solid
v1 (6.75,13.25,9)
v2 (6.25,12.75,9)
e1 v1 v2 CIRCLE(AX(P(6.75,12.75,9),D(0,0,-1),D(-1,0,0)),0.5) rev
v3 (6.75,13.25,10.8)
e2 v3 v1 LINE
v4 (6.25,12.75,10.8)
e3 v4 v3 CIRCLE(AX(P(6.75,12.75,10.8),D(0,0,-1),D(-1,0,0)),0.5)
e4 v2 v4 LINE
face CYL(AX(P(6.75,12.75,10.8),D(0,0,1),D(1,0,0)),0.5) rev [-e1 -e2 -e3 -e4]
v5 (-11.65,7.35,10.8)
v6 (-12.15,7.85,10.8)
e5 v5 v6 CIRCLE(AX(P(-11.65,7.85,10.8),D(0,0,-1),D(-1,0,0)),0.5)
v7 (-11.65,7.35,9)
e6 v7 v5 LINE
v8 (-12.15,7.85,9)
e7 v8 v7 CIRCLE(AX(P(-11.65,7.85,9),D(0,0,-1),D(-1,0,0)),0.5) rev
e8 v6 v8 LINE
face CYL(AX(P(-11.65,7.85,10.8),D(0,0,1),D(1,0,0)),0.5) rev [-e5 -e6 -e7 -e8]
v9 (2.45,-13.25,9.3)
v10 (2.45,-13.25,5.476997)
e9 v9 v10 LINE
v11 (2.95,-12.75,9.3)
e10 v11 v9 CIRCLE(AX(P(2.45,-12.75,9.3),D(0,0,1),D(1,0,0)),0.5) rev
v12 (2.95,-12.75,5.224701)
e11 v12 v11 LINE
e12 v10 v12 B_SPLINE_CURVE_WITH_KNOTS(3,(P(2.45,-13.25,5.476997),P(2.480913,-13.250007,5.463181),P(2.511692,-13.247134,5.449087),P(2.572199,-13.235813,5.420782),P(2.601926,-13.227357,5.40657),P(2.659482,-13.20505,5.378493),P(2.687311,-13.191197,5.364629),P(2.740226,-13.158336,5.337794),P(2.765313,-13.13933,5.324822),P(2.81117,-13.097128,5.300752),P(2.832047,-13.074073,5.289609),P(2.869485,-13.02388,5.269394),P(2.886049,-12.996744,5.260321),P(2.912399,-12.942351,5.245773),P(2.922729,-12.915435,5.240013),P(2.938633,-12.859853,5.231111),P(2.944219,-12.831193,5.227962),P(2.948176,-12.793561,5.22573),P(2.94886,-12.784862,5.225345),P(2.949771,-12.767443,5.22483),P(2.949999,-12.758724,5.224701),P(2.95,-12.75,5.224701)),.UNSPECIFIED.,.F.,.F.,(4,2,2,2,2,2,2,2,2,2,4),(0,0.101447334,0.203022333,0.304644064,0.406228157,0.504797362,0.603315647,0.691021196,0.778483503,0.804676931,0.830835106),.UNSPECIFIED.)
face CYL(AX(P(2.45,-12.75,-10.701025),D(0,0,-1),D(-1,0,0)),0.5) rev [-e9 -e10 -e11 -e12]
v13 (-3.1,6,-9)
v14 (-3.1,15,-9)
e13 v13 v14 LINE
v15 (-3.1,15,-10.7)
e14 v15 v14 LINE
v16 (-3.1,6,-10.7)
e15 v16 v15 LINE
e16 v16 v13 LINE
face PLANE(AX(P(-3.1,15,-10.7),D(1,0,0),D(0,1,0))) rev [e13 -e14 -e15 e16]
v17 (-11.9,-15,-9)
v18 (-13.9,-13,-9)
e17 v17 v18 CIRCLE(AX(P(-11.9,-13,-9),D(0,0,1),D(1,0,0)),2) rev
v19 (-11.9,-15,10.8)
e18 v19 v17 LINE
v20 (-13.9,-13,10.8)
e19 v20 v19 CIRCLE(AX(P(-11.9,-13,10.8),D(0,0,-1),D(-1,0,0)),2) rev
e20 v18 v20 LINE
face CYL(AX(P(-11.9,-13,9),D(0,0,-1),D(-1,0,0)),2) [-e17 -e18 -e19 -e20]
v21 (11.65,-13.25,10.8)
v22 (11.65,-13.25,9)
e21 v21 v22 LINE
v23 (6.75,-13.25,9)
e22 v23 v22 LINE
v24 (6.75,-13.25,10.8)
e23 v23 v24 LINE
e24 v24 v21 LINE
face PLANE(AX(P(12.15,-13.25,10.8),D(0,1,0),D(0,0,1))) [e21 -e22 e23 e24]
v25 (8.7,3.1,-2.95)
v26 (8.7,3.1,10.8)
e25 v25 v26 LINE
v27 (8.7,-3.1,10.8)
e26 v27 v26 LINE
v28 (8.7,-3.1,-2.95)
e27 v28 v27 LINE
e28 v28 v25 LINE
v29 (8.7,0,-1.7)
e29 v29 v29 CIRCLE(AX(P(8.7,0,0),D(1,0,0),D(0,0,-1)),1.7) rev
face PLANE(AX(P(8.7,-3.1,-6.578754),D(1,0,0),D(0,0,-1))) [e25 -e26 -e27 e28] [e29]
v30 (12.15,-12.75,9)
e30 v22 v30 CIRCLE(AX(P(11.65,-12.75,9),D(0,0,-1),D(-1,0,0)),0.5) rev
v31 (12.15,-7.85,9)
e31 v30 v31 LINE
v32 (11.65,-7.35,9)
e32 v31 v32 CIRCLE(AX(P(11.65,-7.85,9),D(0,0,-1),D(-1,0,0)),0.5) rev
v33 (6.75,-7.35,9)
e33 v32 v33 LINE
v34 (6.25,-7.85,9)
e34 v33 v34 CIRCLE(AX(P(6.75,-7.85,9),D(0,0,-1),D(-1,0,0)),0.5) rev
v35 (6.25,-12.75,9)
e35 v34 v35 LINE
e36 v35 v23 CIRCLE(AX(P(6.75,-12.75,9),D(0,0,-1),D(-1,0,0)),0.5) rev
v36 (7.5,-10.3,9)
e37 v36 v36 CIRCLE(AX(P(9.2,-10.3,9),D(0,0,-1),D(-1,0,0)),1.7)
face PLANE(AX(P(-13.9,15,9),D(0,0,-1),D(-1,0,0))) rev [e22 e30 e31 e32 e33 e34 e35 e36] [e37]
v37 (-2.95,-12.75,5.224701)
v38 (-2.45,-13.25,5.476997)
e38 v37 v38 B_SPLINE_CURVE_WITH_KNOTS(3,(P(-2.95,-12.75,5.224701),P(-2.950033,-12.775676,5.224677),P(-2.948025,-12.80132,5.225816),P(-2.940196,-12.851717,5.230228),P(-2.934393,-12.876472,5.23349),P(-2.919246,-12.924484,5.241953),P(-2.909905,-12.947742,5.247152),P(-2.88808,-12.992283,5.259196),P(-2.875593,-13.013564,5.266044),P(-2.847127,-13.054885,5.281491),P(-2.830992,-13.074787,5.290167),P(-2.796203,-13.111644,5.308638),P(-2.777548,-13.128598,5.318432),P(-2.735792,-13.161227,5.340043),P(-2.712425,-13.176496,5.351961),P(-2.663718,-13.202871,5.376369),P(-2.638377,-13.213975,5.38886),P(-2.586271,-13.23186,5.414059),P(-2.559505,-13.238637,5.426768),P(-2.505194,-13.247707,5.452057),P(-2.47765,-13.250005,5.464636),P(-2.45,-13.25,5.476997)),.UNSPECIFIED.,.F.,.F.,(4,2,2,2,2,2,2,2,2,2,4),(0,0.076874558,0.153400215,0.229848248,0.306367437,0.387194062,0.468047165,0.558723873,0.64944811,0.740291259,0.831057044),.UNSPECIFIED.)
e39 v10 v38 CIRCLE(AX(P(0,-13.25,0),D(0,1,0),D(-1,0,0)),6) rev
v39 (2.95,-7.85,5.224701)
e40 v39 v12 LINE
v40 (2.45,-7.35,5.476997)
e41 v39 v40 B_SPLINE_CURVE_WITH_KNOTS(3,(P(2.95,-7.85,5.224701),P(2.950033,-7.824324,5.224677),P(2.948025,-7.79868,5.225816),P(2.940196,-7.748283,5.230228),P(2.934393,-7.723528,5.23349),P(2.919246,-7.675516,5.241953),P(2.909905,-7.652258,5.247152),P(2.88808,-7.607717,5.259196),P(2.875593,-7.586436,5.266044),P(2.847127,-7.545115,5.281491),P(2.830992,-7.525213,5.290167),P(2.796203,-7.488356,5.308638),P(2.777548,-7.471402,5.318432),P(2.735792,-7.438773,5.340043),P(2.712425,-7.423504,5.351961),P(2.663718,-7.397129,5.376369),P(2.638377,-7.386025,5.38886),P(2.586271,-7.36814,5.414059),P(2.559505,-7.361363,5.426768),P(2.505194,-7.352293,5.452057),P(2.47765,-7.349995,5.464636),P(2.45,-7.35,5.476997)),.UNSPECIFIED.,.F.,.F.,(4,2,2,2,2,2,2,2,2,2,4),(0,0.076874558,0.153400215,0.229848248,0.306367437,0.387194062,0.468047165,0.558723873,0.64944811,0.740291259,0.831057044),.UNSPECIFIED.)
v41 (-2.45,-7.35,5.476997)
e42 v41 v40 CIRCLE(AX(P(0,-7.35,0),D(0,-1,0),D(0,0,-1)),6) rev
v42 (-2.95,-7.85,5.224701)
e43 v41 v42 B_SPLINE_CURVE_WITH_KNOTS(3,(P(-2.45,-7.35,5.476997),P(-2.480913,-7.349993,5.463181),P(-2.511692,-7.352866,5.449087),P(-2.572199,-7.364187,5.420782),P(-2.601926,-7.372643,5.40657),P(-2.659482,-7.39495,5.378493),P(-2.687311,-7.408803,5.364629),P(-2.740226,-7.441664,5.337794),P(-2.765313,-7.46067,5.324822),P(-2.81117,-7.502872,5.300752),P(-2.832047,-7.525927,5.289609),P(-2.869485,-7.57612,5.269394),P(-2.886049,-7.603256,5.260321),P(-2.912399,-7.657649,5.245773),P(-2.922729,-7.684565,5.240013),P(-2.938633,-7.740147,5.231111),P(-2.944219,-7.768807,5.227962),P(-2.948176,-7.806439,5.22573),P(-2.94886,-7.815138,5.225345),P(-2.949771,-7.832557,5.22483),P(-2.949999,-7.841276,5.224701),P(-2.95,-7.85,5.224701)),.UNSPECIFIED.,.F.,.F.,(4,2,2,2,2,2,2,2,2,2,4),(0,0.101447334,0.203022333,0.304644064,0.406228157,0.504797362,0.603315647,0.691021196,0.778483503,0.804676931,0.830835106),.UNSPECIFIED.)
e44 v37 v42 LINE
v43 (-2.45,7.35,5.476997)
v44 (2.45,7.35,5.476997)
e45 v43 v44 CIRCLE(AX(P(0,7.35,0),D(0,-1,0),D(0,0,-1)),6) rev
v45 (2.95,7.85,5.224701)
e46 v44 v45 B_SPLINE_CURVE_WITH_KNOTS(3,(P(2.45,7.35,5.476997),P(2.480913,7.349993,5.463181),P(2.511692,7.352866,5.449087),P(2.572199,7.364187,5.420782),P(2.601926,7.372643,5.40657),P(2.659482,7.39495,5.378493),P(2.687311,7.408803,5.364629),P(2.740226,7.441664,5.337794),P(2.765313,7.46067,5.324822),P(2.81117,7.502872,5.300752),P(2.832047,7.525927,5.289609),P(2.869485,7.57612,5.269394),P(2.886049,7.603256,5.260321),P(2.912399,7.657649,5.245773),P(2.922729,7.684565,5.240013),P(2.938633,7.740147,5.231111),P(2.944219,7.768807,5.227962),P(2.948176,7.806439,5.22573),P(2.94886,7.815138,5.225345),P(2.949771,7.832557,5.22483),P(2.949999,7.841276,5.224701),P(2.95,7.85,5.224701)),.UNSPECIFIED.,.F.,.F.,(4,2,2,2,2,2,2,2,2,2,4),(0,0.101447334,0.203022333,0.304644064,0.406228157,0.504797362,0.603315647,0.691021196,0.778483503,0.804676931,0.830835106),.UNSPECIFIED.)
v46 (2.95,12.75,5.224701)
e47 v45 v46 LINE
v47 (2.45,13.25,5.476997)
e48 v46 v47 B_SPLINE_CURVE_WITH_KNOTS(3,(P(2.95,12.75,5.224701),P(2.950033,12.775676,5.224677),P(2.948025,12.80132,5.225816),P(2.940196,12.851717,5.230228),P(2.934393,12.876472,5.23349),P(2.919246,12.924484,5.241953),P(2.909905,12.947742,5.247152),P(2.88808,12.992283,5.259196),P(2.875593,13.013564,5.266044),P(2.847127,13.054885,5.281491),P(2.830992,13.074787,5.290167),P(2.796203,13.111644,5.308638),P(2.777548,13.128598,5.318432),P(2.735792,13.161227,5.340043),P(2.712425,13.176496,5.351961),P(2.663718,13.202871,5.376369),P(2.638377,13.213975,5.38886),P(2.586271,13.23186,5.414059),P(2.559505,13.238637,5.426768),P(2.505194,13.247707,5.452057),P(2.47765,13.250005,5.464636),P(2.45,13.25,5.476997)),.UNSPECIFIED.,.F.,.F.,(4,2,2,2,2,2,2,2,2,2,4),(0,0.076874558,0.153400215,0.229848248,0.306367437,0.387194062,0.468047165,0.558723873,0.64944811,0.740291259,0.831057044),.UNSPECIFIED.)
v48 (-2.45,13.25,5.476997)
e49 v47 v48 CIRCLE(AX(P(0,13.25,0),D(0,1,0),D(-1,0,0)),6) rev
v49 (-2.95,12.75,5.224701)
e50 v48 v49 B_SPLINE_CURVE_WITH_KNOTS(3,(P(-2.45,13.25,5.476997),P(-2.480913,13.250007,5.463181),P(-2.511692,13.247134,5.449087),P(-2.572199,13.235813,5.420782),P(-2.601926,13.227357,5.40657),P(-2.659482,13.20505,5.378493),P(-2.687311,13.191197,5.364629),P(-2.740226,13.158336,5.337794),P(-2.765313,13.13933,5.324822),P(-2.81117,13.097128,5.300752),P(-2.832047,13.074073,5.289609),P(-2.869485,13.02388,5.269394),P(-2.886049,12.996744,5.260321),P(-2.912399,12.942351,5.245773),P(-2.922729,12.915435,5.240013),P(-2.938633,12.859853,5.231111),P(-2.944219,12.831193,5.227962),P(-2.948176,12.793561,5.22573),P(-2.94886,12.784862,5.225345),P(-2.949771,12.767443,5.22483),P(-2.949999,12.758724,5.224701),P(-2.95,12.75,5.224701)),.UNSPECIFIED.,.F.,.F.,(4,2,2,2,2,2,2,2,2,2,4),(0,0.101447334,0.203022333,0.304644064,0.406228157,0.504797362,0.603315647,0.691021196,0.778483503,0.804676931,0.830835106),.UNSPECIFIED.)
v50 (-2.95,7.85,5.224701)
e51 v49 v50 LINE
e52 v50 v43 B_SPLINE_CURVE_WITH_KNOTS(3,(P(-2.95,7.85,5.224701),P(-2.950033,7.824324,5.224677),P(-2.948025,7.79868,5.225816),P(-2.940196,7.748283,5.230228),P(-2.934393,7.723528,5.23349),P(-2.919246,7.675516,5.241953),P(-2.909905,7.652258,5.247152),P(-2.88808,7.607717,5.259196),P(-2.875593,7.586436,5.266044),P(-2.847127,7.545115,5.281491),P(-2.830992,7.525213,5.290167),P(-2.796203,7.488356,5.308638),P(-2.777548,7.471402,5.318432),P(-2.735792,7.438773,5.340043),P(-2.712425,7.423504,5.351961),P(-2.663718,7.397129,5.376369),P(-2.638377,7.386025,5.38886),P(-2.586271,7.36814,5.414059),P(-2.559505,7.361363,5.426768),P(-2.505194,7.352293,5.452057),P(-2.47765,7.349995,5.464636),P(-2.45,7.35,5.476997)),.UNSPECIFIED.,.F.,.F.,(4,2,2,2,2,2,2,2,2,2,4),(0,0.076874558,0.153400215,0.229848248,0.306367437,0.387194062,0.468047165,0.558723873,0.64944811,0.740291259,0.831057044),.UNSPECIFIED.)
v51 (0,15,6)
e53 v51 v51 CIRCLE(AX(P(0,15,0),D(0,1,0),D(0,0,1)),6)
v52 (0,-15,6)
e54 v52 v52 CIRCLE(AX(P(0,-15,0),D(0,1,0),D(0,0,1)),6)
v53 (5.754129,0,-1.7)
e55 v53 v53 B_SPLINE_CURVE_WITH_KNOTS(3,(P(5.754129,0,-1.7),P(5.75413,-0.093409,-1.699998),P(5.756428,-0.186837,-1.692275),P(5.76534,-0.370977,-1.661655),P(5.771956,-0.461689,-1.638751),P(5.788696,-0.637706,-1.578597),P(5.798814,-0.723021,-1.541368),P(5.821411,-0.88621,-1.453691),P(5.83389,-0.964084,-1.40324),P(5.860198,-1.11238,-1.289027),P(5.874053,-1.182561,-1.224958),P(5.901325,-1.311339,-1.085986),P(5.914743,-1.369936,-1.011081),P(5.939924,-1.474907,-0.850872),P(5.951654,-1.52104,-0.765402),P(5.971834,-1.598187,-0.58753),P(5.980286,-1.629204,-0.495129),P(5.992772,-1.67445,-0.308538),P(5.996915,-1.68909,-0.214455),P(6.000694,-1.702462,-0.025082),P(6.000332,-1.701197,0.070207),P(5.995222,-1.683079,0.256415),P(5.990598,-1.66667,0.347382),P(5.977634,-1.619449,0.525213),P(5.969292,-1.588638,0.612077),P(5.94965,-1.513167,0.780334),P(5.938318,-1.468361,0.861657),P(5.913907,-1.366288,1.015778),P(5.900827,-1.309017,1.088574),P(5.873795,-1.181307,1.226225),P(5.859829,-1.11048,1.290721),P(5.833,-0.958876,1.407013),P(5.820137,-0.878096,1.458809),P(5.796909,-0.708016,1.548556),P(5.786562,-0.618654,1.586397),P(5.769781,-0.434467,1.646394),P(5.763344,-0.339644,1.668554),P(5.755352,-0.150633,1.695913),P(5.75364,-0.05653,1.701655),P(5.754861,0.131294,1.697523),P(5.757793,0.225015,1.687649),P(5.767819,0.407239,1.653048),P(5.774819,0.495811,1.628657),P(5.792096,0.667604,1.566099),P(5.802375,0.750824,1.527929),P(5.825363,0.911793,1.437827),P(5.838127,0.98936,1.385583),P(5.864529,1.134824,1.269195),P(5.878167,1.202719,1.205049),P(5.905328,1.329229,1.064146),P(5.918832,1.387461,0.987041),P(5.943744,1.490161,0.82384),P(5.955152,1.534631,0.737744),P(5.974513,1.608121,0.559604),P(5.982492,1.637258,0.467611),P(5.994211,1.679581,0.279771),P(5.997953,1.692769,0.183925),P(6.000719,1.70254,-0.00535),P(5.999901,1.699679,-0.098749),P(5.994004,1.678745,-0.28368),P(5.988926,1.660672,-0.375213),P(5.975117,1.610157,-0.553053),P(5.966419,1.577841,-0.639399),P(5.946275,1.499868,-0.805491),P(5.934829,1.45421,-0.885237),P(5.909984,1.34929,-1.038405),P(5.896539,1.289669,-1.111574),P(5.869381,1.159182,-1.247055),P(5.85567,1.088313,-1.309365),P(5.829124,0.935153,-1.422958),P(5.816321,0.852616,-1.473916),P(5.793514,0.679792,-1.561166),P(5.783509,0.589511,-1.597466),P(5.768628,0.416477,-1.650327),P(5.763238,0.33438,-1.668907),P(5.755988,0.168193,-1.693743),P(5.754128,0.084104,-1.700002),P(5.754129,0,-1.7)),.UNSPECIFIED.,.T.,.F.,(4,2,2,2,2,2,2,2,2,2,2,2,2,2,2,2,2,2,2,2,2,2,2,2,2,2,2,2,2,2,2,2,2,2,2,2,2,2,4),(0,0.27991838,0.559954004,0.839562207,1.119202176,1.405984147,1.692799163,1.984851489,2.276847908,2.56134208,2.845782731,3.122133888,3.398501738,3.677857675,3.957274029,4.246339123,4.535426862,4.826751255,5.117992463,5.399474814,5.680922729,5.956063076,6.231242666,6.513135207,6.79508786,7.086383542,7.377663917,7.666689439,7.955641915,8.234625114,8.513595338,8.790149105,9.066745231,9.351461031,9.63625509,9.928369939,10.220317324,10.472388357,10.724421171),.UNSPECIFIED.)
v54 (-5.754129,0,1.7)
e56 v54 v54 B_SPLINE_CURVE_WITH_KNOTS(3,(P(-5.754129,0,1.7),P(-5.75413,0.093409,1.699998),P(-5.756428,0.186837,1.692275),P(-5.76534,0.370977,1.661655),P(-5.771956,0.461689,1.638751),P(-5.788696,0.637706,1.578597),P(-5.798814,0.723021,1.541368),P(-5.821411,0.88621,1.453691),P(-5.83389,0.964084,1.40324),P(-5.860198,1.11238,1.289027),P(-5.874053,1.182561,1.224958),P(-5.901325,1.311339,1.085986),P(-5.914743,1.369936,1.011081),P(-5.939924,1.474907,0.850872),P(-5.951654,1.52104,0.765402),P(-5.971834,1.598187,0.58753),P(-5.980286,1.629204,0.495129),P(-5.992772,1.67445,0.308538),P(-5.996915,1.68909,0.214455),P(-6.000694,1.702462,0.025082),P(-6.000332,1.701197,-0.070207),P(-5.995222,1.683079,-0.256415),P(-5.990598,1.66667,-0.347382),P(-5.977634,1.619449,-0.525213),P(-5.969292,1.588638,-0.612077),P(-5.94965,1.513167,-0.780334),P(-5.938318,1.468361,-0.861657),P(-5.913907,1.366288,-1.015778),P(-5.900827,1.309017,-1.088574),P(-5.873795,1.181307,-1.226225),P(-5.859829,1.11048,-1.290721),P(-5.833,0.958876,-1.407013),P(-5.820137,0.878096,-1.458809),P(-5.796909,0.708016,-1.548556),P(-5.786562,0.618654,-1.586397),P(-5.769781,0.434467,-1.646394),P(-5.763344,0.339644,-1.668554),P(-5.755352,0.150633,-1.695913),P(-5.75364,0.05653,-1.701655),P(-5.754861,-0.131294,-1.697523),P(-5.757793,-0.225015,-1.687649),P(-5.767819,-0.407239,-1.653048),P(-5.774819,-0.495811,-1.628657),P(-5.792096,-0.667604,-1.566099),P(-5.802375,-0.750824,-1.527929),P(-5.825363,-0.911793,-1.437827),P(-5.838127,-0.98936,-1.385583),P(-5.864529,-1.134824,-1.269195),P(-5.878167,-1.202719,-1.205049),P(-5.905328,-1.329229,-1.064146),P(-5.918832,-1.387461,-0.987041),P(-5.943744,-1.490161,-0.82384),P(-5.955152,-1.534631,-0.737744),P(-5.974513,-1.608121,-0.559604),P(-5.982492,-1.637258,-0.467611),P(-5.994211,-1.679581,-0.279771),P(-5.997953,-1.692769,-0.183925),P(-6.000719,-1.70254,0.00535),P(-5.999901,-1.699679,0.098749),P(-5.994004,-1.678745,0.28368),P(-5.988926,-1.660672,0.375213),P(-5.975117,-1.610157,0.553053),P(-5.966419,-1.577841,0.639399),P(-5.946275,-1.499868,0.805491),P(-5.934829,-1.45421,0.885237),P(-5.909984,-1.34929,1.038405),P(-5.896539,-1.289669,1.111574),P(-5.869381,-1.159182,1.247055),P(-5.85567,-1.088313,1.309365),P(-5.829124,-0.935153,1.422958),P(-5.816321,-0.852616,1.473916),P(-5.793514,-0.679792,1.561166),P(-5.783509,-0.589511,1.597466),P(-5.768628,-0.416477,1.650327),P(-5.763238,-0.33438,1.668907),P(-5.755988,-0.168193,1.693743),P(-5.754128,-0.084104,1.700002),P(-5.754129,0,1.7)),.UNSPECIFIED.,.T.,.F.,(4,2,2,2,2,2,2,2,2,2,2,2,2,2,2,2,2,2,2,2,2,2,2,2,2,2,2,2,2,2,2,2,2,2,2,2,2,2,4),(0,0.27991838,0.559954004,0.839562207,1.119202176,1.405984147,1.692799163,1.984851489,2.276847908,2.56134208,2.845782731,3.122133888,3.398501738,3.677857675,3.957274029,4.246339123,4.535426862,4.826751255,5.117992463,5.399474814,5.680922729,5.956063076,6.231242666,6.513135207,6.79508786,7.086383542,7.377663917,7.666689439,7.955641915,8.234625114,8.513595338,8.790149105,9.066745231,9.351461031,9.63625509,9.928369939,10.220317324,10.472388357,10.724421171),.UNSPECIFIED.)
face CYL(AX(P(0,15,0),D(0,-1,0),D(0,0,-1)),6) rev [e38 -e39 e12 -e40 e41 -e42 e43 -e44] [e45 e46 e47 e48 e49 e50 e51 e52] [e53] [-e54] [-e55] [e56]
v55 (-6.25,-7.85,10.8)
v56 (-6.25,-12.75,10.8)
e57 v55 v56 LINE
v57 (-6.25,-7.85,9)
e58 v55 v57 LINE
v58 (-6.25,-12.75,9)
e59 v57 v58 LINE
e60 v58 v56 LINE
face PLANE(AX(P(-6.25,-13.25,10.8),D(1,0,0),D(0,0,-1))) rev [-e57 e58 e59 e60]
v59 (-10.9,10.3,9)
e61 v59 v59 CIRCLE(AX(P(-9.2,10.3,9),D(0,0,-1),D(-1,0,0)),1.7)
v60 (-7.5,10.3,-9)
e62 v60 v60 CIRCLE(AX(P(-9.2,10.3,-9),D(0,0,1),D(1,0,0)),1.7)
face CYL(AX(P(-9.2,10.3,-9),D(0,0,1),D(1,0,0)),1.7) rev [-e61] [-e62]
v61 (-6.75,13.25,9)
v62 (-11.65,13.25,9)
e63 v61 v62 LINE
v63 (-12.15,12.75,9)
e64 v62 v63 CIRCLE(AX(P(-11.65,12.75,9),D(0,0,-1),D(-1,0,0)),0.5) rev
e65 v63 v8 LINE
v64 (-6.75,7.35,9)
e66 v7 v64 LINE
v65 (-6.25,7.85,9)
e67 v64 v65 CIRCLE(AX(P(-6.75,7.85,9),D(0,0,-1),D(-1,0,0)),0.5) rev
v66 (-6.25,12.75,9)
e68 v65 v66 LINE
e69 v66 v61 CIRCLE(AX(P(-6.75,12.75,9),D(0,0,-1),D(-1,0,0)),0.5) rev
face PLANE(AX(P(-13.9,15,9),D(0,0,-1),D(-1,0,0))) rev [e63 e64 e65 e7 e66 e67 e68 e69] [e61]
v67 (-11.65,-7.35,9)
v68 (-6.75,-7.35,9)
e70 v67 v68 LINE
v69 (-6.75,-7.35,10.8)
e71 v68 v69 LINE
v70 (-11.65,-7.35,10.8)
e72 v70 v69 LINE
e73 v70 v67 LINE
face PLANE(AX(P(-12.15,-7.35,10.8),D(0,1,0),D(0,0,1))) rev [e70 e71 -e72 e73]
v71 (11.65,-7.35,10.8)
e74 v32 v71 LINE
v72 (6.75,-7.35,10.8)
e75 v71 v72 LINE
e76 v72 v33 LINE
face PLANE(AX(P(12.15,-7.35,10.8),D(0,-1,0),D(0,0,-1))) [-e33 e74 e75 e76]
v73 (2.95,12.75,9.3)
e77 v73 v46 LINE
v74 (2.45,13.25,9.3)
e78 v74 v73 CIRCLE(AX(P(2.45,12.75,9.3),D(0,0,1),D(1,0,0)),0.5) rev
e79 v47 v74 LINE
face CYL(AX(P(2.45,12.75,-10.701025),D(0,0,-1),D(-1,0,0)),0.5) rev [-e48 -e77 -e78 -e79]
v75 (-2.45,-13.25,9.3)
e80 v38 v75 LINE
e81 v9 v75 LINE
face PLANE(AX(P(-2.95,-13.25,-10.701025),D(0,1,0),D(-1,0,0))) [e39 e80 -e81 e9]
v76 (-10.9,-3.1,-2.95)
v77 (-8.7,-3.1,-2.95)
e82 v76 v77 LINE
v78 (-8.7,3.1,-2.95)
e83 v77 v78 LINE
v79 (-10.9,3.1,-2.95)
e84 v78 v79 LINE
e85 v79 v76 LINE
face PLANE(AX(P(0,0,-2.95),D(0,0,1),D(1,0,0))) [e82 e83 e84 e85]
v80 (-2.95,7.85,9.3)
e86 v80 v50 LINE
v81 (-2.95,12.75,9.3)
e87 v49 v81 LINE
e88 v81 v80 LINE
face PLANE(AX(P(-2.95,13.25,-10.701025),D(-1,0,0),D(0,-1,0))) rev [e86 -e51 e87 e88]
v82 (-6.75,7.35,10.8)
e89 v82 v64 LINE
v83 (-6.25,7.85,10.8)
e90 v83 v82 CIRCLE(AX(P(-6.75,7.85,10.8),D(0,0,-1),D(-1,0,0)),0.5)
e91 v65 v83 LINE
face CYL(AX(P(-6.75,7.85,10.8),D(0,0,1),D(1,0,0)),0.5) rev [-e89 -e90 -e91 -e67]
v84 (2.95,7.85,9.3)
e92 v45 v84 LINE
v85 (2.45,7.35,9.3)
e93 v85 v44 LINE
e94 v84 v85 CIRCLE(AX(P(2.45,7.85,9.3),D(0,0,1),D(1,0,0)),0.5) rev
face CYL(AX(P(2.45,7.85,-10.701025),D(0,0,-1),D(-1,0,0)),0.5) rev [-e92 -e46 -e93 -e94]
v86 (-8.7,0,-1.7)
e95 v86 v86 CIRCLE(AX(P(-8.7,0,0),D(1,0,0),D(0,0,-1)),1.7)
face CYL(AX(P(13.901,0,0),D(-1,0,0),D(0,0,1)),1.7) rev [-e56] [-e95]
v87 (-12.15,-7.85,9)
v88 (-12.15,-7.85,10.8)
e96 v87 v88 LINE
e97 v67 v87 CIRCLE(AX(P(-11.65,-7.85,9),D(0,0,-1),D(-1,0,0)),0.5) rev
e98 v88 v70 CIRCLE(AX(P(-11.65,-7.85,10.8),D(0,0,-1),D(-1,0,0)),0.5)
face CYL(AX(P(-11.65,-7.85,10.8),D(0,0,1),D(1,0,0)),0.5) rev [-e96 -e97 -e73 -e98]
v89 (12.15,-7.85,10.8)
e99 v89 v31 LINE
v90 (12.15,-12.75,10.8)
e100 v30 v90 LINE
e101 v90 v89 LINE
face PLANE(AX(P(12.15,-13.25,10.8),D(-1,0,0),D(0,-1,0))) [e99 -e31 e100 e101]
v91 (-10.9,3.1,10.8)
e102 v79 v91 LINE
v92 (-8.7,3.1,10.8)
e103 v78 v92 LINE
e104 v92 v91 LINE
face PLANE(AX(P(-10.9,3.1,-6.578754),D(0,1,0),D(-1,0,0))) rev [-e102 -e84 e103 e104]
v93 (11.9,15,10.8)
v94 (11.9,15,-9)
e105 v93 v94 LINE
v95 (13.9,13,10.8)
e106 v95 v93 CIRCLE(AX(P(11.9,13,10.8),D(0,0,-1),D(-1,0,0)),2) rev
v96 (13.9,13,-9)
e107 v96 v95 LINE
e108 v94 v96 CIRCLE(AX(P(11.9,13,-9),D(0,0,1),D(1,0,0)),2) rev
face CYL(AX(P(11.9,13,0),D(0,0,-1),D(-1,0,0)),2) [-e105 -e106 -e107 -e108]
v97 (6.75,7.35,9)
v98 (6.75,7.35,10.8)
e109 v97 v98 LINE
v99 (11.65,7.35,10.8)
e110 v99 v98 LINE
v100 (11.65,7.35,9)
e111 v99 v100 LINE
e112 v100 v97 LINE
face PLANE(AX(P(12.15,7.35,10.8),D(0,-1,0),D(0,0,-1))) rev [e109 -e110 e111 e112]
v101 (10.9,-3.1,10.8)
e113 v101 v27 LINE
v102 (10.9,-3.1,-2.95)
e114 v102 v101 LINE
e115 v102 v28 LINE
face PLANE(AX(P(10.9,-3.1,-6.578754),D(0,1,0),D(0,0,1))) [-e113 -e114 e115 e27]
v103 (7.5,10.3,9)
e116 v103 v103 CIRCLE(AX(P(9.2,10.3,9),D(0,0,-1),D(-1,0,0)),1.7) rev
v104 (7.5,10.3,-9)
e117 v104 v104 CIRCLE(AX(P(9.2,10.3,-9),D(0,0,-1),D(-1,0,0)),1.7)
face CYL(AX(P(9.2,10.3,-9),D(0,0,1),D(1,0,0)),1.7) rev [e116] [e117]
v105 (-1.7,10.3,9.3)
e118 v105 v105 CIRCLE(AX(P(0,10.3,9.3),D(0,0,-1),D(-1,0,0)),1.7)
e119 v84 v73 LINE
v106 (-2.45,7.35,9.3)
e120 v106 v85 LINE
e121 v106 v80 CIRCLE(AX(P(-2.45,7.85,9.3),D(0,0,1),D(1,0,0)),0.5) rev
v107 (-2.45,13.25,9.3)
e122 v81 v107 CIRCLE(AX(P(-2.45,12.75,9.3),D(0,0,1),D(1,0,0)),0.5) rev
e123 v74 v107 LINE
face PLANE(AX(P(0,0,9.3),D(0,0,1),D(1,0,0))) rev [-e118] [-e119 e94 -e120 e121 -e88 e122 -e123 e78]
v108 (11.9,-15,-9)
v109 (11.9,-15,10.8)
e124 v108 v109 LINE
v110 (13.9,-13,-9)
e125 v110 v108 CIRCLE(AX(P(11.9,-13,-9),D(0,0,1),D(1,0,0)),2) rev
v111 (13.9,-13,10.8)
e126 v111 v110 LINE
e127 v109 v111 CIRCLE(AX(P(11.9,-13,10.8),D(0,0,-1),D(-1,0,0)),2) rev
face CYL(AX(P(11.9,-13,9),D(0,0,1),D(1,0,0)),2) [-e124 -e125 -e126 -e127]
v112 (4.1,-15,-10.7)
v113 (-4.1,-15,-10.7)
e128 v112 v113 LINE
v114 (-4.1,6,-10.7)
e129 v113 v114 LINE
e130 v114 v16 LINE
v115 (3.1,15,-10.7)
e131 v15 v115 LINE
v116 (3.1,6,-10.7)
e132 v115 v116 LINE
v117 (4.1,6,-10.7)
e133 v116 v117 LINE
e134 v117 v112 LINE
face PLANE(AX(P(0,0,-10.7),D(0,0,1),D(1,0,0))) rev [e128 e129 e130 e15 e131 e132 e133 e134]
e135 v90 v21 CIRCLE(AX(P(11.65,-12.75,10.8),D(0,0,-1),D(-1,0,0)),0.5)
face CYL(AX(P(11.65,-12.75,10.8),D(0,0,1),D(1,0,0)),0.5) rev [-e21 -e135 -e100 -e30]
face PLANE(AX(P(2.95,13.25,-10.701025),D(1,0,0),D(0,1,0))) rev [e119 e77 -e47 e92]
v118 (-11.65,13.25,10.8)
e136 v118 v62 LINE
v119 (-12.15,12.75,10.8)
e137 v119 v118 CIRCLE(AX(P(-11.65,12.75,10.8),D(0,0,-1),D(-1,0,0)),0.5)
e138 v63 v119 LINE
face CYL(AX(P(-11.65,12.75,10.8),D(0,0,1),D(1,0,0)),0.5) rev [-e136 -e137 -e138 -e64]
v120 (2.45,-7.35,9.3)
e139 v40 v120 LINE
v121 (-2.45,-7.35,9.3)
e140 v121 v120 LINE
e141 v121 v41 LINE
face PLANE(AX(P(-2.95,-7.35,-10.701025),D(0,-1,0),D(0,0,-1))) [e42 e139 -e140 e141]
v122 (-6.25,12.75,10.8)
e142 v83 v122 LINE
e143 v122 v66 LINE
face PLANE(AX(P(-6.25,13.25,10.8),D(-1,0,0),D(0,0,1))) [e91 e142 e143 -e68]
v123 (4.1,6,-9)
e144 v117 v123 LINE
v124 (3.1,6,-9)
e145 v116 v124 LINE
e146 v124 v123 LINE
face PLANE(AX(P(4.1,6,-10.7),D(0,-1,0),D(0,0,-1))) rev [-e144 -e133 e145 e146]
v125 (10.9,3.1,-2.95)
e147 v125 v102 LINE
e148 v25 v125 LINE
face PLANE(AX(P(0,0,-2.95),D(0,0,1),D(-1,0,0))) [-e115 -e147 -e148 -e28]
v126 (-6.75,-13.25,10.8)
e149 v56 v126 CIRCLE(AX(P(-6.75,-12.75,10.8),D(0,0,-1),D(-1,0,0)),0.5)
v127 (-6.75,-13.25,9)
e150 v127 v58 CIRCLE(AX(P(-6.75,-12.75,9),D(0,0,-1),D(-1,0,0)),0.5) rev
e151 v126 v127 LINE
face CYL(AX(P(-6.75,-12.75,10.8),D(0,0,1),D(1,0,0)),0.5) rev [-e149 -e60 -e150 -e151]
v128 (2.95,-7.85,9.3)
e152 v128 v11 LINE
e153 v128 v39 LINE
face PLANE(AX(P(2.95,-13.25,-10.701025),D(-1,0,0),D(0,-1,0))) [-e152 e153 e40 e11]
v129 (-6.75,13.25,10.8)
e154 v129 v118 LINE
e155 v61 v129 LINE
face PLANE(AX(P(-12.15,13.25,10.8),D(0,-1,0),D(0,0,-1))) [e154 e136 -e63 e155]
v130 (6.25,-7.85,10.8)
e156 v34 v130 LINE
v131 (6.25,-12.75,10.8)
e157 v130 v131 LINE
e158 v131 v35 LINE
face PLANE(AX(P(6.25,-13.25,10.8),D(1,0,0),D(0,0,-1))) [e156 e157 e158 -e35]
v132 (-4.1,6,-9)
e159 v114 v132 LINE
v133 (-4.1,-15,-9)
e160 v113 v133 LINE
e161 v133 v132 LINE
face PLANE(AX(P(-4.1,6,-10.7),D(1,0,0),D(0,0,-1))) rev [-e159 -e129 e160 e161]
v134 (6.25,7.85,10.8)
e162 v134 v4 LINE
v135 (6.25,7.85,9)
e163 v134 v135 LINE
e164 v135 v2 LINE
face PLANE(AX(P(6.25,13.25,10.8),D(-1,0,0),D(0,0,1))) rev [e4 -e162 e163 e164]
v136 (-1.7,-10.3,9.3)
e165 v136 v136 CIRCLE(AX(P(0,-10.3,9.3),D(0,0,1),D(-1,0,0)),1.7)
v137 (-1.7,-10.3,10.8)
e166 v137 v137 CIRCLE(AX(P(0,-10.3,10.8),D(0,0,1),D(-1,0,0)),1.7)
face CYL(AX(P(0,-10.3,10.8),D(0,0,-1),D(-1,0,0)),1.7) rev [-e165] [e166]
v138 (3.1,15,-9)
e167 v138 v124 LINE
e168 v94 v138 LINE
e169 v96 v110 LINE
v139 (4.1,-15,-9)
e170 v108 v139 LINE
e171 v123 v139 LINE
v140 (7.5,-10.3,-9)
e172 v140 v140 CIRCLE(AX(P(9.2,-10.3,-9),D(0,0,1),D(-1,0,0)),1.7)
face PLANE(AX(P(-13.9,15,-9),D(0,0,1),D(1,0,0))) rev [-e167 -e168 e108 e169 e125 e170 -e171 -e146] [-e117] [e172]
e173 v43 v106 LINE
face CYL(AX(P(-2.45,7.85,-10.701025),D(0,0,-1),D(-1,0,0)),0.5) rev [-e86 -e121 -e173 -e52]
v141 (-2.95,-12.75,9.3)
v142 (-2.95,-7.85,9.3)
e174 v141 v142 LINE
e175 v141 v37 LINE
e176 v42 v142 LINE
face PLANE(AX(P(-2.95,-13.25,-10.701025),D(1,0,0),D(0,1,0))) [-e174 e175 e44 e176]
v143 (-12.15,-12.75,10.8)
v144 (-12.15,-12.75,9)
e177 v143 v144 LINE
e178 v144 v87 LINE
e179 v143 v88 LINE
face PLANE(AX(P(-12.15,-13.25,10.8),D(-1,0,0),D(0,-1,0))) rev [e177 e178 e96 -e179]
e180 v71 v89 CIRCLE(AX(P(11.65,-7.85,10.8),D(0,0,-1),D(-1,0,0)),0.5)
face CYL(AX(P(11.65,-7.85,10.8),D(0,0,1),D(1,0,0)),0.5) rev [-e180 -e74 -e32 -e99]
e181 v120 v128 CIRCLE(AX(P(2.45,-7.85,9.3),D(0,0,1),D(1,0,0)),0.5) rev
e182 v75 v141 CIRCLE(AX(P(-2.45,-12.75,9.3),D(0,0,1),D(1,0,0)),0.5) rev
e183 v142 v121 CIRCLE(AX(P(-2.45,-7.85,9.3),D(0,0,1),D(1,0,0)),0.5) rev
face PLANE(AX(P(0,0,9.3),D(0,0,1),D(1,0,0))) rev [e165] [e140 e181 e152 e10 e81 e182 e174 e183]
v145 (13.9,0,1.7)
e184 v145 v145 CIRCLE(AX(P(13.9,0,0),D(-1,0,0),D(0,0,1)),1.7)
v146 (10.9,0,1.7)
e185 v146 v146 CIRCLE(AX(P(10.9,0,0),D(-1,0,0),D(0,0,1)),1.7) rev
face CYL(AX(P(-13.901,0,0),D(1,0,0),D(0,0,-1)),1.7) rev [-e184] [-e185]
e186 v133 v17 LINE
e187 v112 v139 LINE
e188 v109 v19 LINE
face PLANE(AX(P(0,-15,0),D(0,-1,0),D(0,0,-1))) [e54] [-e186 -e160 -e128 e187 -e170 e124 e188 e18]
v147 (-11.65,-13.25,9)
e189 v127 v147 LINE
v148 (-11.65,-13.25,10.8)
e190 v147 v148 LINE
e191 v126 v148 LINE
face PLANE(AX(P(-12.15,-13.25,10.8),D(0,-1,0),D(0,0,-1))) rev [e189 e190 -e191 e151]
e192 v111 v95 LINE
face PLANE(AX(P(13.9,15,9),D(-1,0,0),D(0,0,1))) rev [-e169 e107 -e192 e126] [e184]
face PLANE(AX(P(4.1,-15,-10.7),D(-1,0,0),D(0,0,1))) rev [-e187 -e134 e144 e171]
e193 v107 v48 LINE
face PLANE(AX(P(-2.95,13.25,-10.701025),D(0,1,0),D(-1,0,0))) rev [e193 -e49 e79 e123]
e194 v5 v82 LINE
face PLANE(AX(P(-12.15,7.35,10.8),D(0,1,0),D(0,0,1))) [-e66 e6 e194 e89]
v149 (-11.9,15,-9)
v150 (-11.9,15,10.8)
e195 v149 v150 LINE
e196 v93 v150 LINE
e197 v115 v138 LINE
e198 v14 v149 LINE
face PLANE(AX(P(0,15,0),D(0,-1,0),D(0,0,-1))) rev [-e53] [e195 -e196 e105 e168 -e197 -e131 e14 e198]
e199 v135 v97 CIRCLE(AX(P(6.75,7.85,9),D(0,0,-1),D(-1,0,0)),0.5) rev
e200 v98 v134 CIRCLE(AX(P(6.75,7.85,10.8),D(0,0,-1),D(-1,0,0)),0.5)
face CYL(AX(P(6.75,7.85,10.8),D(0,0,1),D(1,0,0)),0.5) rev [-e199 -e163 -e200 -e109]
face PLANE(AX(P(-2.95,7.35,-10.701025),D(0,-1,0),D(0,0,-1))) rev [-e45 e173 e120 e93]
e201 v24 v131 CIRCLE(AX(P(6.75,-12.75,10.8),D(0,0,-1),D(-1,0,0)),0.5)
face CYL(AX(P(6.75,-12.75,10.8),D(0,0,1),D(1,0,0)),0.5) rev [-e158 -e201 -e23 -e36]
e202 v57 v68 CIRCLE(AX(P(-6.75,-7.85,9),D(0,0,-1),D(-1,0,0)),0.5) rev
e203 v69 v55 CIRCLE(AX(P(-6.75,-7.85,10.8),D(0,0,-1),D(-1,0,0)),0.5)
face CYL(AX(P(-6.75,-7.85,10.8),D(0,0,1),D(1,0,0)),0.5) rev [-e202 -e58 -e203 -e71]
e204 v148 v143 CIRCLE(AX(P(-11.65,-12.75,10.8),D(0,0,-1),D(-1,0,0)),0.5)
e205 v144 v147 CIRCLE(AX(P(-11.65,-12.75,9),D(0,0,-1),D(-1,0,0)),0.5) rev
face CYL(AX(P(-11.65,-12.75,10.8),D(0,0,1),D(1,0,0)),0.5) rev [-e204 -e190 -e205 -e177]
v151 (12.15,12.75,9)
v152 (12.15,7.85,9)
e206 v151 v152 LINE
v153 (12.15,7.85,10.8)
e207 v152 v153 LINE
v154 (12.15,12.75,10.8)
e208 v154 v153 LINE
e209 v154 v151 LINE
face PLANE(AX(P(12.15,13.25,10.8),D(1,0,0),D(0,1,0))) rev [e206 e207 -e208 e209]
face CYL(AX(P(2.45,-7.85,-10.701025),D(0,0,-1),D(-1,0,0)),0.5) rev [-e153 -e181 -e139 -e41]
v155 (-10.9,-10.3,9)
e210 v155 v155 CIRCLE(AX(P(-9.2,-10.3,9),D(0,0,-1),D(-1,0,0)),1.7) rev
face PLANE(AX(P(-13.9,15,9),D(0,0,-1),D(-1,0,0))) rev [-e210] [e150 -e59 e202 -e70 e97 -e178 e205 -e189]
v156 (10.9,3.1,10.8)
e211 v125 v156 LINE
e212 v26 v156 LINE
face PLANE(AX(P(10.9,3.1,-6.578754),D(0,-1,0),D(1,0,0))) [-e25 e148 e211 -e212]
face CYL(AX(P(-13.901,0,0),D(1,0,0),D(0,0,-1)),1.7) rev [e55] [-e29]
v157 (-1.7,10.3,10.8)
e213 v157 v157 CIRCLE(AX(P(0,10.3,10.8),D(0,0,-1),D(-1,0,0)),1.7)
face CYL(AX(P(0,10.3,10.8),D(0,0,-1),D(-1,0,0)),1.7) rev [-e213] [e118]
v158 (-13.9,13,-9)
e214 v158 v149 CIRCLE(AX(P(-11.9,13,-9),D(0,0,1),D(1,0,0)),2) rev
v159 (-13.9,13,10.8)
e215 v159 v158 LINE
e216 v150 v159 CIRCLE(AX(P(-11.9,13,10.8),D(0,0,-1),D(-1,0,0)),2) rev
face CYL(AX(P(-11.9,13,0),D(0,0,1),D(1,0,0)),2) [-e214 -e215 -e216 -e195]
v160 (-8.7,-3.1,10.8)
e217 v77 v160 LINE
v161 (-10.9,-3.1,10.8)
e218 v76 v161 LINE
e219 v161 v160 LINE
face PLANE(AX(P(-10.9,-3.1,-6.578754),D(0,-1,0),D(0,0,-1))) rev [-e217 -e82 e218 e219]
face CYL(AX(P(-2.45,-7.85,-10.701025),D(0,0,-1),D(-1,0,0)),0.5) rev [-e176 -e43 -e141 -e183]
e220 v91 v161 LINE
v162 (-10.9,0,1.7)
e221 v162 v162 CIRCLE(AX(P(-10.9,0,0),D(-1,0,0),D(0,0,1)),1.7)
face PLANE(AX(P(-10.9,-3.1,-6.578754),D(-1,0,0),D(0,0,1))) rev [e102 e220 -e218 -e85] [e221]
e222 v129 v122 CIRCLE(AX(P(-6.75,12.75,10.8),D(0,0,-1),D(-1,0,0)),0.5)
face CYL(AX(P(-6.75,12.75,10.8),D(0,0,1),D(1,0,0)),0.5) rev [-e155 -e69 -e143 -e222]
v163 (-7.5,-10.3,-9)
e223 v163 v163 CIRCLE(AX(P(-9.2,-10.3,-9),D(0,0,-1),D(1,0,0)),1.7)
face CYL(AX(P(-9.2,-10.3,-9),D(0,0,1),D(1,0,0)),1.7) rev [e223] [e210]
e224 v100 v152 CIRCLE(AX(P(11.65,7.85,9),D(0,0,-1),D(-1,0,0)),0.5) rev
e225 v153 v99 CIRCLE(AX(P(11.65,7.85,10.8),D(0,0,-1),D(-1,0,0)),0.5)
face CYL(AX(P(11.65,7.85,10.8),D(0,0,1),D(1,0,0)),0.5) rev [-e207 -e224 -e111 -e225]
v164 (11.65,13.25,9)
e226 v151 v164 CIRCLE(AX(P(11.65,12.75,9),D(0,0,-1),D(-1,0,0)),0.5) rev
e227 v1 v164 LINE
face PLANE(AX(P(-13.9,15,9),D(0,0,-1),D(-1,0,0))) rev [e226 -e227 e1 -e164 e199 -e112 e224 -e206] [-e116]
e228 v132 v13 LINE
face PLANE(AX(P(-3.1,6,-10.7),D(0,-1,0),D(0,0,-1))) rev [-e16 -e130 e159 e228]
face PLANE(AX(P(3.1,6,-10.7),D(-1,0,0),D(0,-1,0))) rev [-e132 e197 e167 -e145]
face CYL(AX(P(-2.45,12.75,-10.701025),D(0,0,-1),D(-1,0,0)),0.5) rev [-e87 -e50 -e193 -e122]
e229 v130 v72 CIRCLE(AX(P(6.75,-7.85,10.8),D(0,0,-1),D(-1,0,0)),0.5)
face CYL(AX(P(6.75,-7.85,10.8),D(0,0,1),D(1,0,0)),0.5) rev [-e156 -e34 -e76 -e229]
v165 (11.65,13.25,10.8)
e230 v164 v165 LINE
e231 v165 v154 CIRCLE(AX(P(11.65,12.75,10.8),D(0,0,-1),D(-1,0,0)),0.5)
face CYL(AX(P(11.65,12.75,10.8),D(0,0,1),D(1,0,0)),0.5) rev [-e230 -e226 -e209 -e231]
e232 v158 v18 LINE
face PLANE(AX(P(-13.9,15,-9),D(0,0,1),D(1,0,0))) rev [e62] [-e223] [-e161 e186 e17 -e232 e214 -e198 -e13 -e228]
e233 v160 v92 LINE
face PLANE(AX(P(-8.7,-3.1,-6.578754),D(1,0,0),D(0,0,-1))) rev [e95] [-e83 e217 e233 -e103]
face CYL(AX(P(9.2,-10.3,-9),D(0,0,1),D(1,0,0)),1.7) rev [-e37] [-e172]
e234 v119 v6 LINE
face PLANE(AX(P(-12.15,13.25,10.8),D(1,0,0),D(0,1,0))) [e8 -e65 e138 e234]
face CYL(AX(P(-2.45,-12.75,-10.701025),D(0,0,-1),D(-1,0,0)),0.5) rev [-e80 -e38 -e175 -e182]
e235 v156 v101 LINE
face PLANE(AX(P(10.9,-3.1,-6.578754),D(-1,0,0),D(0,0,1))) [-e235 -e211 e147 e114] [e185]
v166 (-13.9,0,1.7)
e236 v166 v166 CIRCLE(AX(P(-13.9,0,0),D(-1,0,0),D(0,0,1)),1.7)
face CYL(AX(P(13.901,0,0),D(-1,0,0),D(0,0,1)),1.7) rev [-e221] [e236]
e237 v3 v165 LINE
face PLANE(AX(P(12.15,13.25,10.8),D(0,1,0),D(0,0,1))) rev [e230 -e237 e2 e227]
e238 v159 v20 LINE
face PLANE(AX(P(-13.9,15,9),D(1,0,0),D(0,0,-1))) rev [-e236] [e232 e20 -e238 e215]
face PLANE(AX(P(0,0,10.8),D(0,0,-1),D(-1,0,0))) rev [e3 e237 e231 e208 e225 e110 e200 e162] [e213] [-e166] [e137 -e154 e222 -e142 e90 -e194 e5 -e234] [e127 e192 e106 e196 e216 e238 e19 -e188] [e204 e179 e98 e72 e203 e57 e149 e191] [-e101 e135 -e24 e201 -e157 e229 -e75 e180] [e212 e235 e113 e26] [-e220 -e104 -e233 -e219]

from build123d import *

# Parameters (mm, degrees)
SKETCH2_W               = 27.8
SKETCH2_H               = 18
SKETCH2_R               = 6
BOSS_EXTRUDE1_DEPTH     = 15
SKETCH7_W               = 13.9
SKETCH7_H               = 15
SKETCH7_W_2             = 5.9
SKETCH7_H_2             = 5.9
BOSS_EXTRUDE3_DEPTH     = 1.8
SKETCH8_R               = 1.7
CUT_EXTRUDE3_DEPTH      = 29.464890655
FILLET4_R               = 0.5
FILLET4_OF_MIRROR1_R    = 0.5
MIRROR2_START           = -9
MIRROR2_OUTLINE_R       = 1.7
MIRROR2_DEPTH           = 18
MIRROR2_START_2         = 9
MIRROR2_2_OUTLINE_W     = 13.9
MIRROR2_2_OUTLINE_H     = 30
MIRROR2_2_DEPTH         = 1.8
FILLET3_R               = 2
BOSS_EXTRUDE4_DEPTH     = 1.7
CUT_EXTRUDE4_REACH      = 33.173
CUT_EXTRUDE4_END_RADIUS = 6
CUT_EXTRUDE4_START      = -1.5
SKETCH10_W              = 5.9
SKETCH10_H              = 5.9
FILLET5_R               = 0.5
SKETCH11_R              = 1.7
CUT_EXTRUDE5_DEPTH      = 29.604370348
FILLET5_OF_MIRROR3_R    = 0.5
CUT_EXTRUDE6_START      = -10.8
SKETCH12_W              = 2.2
SKETCH12_H              = 6.2
CUT_EXTRUDE6_DEPTH      = 10.8
SKETCH13_W              = 2.2
SKETCH13_H              = 6.2
CUT_EXTRUDE7_DEPTH      = 2.95
CUT_EXTRUDE8_REACH      = 35.384
CUT_EXTRUDE8_END_RADIUS = 6
SKETCH14_R              = 1.7


# Read off the part's stored shape, not the designer's step: Mirror2
with BuildPart() as part:
    # Sketch2 → Boss-Extrude1 (new, symmetric)
    with BuildSketch(Plane(origin=(0, 0, 0), x_dir=(1, 0, 0), z_dir=(0, 1, 0))):
        Rectangle(SKETCH2_W, SKETCH2_H)
        with Locations(Location((0, 0, 0), (0, 0, 270))):
            Circle(SKETCH2_R, mode=Mode.SUBTRACT)
    extrude(amount=BOSS_EXTRUDE1_DEPTH, both=True)

    # Sketch7 → Boss-Extrude3 (add)
    with BuildSketch(Plane.XY.offset(9)):
        with Locations((-6.95, 7.5)):
            Rectangle(SKETCH7_W, SKETCH7_H)
        with Locations((-9.2, 10.3)):
            Rectangle(SKETCH7_W_2, SKETCH7_H_2, mode=Mode.SUBTRACT)
    boss_extrude3 = extrude(amount=BOSS_EXTRUDE3_DEPTH)

    # Sketch8 → Cut-Extrude3 (cut, through all)
    with BuildSketch(Plane.XY.offset(10.8)):
        with Locations((-9.2, 10.3)):
            Circle(SKETCH8_R)
    cut_extrude3 = extrude(amount=-CUT_EXTRUDE3_DEPTH, mode=Mode.SUBTRACT)

    # Fillet4
    fillet4_edges = [part.edges().sort_by_distance(p)[0] for p in [
        (-6.25, 13.25, 9.9),
        (-12.15, 13.25, 9.9),
        (-12.15, 7.35, 9.9),
        (-6.25, 7.35, 9.9),
    ]]
    fillet(fillet4_edges, radius=FILLET4_R)

    # Mirror1: Boss-Extrude3, Cut-Extrude3 across plane
    add(boss_extrude3.mirror(Plane.ZX))
    add(cut_extrude3.mirror(Plane.ZX), mode=Mode.SUBTRACT)

    # Fillet4 of Mirror1
    fillet4_of_mirror1_edges = [part.edges().sort_by_distance(p)[0] for p in [
        (-6.25, -13.25, 9.9),
        (-12.15, -13.25, 9.9),
        (-12.15, -7.35, 9.9),
        (-6.25, -7.35, 9.9),
    ]]
    fillet(fillet4_of_mirror1_edges, radius=FILLET4_OF_MIRROR1_R)

    # Mirror2 outline → Mirror2 (cut)
    with BuildSketch(Plane.XY.offset(MIRROR2_START)):
        with Locations((9.2, -10.3)):
            Circle(MIRROR2_OUTLINE_R)
        with Locations((9.2, 10.3)):
            Circle(MIRROR2_OUTLINE_R)
    extrude(amount=MIRROR2_DEPTH, mode=Mode.SUBTRACT)

    # Mirror2 2 outline → Mirror2 2 (add)
    with BuildSketch(Plane.XY.offset(MIRROR2_START_2)):
        with Locations((6.95, 0)):
            Rectangle(MIRROR2_2_OUTLINE_W, MIRROR2_2_OUTLINE_H)
        with BuildLine():
            ThreePointArc((6.25, -7.85), (6.396446609, -7.496446609), (6.75, -7.35))
            Line((6.75, -7.35), (11.65, -7.35))
            ThreePointArc((11.65, -7.35), (12.003553391, -7.496446609), (12.15, -7.85))
            Line((12.15, -7.85), (12.15, -12.75))
            ThreePointArc((12.15, -12.75), (12.003553391, -13.103553391), (11.65, -13.25))
            Line((11.65, -13.25), (6.75, -13.25))
            ThreePointArc((6.75, -13.25), (6.396446609, -13.103553391), (6.25, -12.75))
            Line((6.25, -12.75), (6.25, -7.85))
        make_face(mode=Mode.SUBTRACT)
        with BuildLine():
            Line((6.75, 13.25), (11.65, 13.25))
            ThreePointArc((11.65, 13.25), (12.003553391, 13.103553391), (12.15, 12.75))
            Line((12.15, 12.75), (12.15, 7.85))
            ThreePointArc((12.15, 7.85), (12.003553391, 7.496446609), (11.65, 7.35))
            Line((11.65, 7.35), (6.75, 7.35))
            ThreePointArc((6.75, 7.35), (6.396446609, 7.496446609), (6.25, 7.85))
            Line((6.25, 7.85), (6.25, 12.75))
            ThreePointArc((6.25, 12.75), (6.396446609, 13.103553391), (6.75, 13.25))
        make_face(mode=Mode.SUBTRACT)
    extrude(amount=MIRROR2_2_DEPTH)

    # Fillet3
    fillet3_edges = [part.edges().sort_by_distance(p)[0] for p in [
        (-13.9, 15, 0.9),
        (13.9, 15, 0.9),
        (-13.9, -15, 0.9),
        (13.9, -15, 0.9),
    ]]
    fillet(fillet3_edges, radius=FILLET3_R)

    # Sketch9 → Boss-Extrude4 (add)
    with BuildSketch(Plane(origin=(0, 0, -9), x_dir=(-1, 0, 0), z_dir=(0, 0, -1))):
        Polygon((-3.1, 15), (3.1, 15), (3.1, 6), (4.1, 6), (4.1, -15), (-4.1, -15), (-4.1, 6), (-3.1, 6), align=None)
    extrude(amount=BOSS_EXTRUDE4_DEPTH)

    # Cut-Extrude4: up to this cylinder (the profile starts outside it)
    cut_extrude4_end = Plane(origin=(0, 10.3, 0), z_dir=(0, -1, 0)) * Cylinder(CUT_EXTRUDE4_END_RADIUS, 79.346, mode=Mode.PRIVATE)
    # Sketch10 → Cut-Extrude4 (cut, up to the surface)
    with BuildSketch(Plane.XY.offset(10.8).offset(CUT_EXTRUDE4_START), mode=Mode.PRIVATE) as cut_extrude4_sk1:
        with Locations((0, 10.3)):
            Rectangle(SKETCH10_W, SKETCH10_H)
    cut_extrude4_tool1 = extrude(cut_extrude4_sk1.sketch, amount=-CUT_EXTRUDE4_REACH, mode=Mode.PRIVATE) - cut_extrude4_end
    cut_extrude4 = cut_extrude4_tool1.solids().sort_by_distance((0, 10.3, 9.3))[0]
    add(cut_extrude4, mode=Mode.SUBTRACT)

    # Fillet5
    fillet5_edges = [part.edges().sort_by_distance(p)[0] for p in [
        (2.95, 13.25, 7.262350474),
        (2.95, 7.35, 7.262350474),
        (-2.95, 7.35, 7.262350474),
        (-2.95, 13.25, 7.262350474),
    ]]
    fillet(fillet5_edges, radius=FILLET5_R)

    # Sketch11 → Cut-Extrude5 (cut, through all)
    with BuildSketch(Plane(origin=(0, 0, 9.3), x_dir=(-1, 0, 0), z_dir=(0, 0, -1))):
        with Locations((0, 10.3)):
            Circle(SKETCH11_R)
    cut_extrude5 = extrude(amount=-CUT_EXTRUDE5_DEPTH, mode=Mode.SUBTRACT)

    # Mirror3: Cut-Extrude4, Cut-Extrude5 across plane
    add(cut_extrude4.mirror(Plane.ZX), mode=Mode.SUBTRACT)
    add(cut_extrude5.mirror(Plane.ZX), mode=Mode.SUBTRACT)

    # Fillet5 of Mirror3
    fillet5_of_mirror3_edges = [part.edges().sort_by_distance(p)[0] for p in [
        (2.95, -13.25, 7.262350474),
        (2.95, -7.35, 7.262350474),
        (-2.95, -7.35, 7.262350474),
        (-2.95, -13.25, 7.262350474),
    ]]
    fillet(fillet5_of_mirror3_edges, radius=FILLET5_OF_MIRROR3_R)

    # Sketch12 → Cut-Extrude6 (cut)
    with BuildSketch(Plane.XY.offset(10.8).offset(CUT_EXTRUDE6_START)):
        with Locations((-9.8, 0)):
            Rectangle(SKETCH12_W, SKETCH12_H)
    cut_extrude6 = extrude(amount=CUT_EXTRUDE6_DEPTH, mode=Mode.SUBTRACT)

    # Sketch13 → Cut-Extrude7 (cut)
    with BuildSketch(Plane.XY):
        with Locations((-9.8, 0)):
            Rectangle(SKETCH13_W, SKETCH13_H)
    cut_extrude7 = extrude(amount=-CUT_EXTRUDE7_DEPTH, mode=Mode.SUBTRACT)

    # Cut-Extrude8: up to this cylinder (the profile starts outside it)
    cut_extrude8_end = Plane(origin=(0, 0, 0), z_dir=(0, -1, 0)) * Cylinder(CUT_EXTRUDE8_END_RADIUS, 83.768, mode=Mode.PRIVATE)
    # Sketch14 → Cut-Extrude8 (cut, up to the surface)
    with BuildSketch(Plane.ZY.offset(13.9), mode=Mode.PRIVATE) as cut_extrude8_sk1:
        Circle(SKETCH14_R)
    cut_extrude8_tool1 = extrude(cut_extrude8_sk1.sketch, amount=-CUT_EXTRUDE8_REACH, mode=Mode.PRIVATE) - cut_extrude8_end
    cut_extrude8 = cut_extrude8_tool1.solids().sort_by_distance((-13.9, 0, 0))[0]
    add(cut_extrude8, mode=Mode.SUBTRACT)

    # Mirror4: Cut-Extrude6, Cut-Extrude7, Cut-Extrude8 across plane
    add(cut_extrude6.mirror(Plane(origin=(0, 0, 0), x_dir=(0, 0, 1), z_dir=(1, 0, 0))), mode=Mode.SUBTRACT)
    add(cut_extrude7.mirror(Plane(origin=(0, 0, 0), x_dir=(0, 0, 1), z_dir=(1, 0, 0))), mode=Mode.SUBTRACT)
    add(cut_extrude8.mirror(Plane(origin=(0, 0, 0), x_dir=(0, 0, 1), z_dir=(1, 0, 0))), mode=Mode.SUBTRACT)


solid = part.part
